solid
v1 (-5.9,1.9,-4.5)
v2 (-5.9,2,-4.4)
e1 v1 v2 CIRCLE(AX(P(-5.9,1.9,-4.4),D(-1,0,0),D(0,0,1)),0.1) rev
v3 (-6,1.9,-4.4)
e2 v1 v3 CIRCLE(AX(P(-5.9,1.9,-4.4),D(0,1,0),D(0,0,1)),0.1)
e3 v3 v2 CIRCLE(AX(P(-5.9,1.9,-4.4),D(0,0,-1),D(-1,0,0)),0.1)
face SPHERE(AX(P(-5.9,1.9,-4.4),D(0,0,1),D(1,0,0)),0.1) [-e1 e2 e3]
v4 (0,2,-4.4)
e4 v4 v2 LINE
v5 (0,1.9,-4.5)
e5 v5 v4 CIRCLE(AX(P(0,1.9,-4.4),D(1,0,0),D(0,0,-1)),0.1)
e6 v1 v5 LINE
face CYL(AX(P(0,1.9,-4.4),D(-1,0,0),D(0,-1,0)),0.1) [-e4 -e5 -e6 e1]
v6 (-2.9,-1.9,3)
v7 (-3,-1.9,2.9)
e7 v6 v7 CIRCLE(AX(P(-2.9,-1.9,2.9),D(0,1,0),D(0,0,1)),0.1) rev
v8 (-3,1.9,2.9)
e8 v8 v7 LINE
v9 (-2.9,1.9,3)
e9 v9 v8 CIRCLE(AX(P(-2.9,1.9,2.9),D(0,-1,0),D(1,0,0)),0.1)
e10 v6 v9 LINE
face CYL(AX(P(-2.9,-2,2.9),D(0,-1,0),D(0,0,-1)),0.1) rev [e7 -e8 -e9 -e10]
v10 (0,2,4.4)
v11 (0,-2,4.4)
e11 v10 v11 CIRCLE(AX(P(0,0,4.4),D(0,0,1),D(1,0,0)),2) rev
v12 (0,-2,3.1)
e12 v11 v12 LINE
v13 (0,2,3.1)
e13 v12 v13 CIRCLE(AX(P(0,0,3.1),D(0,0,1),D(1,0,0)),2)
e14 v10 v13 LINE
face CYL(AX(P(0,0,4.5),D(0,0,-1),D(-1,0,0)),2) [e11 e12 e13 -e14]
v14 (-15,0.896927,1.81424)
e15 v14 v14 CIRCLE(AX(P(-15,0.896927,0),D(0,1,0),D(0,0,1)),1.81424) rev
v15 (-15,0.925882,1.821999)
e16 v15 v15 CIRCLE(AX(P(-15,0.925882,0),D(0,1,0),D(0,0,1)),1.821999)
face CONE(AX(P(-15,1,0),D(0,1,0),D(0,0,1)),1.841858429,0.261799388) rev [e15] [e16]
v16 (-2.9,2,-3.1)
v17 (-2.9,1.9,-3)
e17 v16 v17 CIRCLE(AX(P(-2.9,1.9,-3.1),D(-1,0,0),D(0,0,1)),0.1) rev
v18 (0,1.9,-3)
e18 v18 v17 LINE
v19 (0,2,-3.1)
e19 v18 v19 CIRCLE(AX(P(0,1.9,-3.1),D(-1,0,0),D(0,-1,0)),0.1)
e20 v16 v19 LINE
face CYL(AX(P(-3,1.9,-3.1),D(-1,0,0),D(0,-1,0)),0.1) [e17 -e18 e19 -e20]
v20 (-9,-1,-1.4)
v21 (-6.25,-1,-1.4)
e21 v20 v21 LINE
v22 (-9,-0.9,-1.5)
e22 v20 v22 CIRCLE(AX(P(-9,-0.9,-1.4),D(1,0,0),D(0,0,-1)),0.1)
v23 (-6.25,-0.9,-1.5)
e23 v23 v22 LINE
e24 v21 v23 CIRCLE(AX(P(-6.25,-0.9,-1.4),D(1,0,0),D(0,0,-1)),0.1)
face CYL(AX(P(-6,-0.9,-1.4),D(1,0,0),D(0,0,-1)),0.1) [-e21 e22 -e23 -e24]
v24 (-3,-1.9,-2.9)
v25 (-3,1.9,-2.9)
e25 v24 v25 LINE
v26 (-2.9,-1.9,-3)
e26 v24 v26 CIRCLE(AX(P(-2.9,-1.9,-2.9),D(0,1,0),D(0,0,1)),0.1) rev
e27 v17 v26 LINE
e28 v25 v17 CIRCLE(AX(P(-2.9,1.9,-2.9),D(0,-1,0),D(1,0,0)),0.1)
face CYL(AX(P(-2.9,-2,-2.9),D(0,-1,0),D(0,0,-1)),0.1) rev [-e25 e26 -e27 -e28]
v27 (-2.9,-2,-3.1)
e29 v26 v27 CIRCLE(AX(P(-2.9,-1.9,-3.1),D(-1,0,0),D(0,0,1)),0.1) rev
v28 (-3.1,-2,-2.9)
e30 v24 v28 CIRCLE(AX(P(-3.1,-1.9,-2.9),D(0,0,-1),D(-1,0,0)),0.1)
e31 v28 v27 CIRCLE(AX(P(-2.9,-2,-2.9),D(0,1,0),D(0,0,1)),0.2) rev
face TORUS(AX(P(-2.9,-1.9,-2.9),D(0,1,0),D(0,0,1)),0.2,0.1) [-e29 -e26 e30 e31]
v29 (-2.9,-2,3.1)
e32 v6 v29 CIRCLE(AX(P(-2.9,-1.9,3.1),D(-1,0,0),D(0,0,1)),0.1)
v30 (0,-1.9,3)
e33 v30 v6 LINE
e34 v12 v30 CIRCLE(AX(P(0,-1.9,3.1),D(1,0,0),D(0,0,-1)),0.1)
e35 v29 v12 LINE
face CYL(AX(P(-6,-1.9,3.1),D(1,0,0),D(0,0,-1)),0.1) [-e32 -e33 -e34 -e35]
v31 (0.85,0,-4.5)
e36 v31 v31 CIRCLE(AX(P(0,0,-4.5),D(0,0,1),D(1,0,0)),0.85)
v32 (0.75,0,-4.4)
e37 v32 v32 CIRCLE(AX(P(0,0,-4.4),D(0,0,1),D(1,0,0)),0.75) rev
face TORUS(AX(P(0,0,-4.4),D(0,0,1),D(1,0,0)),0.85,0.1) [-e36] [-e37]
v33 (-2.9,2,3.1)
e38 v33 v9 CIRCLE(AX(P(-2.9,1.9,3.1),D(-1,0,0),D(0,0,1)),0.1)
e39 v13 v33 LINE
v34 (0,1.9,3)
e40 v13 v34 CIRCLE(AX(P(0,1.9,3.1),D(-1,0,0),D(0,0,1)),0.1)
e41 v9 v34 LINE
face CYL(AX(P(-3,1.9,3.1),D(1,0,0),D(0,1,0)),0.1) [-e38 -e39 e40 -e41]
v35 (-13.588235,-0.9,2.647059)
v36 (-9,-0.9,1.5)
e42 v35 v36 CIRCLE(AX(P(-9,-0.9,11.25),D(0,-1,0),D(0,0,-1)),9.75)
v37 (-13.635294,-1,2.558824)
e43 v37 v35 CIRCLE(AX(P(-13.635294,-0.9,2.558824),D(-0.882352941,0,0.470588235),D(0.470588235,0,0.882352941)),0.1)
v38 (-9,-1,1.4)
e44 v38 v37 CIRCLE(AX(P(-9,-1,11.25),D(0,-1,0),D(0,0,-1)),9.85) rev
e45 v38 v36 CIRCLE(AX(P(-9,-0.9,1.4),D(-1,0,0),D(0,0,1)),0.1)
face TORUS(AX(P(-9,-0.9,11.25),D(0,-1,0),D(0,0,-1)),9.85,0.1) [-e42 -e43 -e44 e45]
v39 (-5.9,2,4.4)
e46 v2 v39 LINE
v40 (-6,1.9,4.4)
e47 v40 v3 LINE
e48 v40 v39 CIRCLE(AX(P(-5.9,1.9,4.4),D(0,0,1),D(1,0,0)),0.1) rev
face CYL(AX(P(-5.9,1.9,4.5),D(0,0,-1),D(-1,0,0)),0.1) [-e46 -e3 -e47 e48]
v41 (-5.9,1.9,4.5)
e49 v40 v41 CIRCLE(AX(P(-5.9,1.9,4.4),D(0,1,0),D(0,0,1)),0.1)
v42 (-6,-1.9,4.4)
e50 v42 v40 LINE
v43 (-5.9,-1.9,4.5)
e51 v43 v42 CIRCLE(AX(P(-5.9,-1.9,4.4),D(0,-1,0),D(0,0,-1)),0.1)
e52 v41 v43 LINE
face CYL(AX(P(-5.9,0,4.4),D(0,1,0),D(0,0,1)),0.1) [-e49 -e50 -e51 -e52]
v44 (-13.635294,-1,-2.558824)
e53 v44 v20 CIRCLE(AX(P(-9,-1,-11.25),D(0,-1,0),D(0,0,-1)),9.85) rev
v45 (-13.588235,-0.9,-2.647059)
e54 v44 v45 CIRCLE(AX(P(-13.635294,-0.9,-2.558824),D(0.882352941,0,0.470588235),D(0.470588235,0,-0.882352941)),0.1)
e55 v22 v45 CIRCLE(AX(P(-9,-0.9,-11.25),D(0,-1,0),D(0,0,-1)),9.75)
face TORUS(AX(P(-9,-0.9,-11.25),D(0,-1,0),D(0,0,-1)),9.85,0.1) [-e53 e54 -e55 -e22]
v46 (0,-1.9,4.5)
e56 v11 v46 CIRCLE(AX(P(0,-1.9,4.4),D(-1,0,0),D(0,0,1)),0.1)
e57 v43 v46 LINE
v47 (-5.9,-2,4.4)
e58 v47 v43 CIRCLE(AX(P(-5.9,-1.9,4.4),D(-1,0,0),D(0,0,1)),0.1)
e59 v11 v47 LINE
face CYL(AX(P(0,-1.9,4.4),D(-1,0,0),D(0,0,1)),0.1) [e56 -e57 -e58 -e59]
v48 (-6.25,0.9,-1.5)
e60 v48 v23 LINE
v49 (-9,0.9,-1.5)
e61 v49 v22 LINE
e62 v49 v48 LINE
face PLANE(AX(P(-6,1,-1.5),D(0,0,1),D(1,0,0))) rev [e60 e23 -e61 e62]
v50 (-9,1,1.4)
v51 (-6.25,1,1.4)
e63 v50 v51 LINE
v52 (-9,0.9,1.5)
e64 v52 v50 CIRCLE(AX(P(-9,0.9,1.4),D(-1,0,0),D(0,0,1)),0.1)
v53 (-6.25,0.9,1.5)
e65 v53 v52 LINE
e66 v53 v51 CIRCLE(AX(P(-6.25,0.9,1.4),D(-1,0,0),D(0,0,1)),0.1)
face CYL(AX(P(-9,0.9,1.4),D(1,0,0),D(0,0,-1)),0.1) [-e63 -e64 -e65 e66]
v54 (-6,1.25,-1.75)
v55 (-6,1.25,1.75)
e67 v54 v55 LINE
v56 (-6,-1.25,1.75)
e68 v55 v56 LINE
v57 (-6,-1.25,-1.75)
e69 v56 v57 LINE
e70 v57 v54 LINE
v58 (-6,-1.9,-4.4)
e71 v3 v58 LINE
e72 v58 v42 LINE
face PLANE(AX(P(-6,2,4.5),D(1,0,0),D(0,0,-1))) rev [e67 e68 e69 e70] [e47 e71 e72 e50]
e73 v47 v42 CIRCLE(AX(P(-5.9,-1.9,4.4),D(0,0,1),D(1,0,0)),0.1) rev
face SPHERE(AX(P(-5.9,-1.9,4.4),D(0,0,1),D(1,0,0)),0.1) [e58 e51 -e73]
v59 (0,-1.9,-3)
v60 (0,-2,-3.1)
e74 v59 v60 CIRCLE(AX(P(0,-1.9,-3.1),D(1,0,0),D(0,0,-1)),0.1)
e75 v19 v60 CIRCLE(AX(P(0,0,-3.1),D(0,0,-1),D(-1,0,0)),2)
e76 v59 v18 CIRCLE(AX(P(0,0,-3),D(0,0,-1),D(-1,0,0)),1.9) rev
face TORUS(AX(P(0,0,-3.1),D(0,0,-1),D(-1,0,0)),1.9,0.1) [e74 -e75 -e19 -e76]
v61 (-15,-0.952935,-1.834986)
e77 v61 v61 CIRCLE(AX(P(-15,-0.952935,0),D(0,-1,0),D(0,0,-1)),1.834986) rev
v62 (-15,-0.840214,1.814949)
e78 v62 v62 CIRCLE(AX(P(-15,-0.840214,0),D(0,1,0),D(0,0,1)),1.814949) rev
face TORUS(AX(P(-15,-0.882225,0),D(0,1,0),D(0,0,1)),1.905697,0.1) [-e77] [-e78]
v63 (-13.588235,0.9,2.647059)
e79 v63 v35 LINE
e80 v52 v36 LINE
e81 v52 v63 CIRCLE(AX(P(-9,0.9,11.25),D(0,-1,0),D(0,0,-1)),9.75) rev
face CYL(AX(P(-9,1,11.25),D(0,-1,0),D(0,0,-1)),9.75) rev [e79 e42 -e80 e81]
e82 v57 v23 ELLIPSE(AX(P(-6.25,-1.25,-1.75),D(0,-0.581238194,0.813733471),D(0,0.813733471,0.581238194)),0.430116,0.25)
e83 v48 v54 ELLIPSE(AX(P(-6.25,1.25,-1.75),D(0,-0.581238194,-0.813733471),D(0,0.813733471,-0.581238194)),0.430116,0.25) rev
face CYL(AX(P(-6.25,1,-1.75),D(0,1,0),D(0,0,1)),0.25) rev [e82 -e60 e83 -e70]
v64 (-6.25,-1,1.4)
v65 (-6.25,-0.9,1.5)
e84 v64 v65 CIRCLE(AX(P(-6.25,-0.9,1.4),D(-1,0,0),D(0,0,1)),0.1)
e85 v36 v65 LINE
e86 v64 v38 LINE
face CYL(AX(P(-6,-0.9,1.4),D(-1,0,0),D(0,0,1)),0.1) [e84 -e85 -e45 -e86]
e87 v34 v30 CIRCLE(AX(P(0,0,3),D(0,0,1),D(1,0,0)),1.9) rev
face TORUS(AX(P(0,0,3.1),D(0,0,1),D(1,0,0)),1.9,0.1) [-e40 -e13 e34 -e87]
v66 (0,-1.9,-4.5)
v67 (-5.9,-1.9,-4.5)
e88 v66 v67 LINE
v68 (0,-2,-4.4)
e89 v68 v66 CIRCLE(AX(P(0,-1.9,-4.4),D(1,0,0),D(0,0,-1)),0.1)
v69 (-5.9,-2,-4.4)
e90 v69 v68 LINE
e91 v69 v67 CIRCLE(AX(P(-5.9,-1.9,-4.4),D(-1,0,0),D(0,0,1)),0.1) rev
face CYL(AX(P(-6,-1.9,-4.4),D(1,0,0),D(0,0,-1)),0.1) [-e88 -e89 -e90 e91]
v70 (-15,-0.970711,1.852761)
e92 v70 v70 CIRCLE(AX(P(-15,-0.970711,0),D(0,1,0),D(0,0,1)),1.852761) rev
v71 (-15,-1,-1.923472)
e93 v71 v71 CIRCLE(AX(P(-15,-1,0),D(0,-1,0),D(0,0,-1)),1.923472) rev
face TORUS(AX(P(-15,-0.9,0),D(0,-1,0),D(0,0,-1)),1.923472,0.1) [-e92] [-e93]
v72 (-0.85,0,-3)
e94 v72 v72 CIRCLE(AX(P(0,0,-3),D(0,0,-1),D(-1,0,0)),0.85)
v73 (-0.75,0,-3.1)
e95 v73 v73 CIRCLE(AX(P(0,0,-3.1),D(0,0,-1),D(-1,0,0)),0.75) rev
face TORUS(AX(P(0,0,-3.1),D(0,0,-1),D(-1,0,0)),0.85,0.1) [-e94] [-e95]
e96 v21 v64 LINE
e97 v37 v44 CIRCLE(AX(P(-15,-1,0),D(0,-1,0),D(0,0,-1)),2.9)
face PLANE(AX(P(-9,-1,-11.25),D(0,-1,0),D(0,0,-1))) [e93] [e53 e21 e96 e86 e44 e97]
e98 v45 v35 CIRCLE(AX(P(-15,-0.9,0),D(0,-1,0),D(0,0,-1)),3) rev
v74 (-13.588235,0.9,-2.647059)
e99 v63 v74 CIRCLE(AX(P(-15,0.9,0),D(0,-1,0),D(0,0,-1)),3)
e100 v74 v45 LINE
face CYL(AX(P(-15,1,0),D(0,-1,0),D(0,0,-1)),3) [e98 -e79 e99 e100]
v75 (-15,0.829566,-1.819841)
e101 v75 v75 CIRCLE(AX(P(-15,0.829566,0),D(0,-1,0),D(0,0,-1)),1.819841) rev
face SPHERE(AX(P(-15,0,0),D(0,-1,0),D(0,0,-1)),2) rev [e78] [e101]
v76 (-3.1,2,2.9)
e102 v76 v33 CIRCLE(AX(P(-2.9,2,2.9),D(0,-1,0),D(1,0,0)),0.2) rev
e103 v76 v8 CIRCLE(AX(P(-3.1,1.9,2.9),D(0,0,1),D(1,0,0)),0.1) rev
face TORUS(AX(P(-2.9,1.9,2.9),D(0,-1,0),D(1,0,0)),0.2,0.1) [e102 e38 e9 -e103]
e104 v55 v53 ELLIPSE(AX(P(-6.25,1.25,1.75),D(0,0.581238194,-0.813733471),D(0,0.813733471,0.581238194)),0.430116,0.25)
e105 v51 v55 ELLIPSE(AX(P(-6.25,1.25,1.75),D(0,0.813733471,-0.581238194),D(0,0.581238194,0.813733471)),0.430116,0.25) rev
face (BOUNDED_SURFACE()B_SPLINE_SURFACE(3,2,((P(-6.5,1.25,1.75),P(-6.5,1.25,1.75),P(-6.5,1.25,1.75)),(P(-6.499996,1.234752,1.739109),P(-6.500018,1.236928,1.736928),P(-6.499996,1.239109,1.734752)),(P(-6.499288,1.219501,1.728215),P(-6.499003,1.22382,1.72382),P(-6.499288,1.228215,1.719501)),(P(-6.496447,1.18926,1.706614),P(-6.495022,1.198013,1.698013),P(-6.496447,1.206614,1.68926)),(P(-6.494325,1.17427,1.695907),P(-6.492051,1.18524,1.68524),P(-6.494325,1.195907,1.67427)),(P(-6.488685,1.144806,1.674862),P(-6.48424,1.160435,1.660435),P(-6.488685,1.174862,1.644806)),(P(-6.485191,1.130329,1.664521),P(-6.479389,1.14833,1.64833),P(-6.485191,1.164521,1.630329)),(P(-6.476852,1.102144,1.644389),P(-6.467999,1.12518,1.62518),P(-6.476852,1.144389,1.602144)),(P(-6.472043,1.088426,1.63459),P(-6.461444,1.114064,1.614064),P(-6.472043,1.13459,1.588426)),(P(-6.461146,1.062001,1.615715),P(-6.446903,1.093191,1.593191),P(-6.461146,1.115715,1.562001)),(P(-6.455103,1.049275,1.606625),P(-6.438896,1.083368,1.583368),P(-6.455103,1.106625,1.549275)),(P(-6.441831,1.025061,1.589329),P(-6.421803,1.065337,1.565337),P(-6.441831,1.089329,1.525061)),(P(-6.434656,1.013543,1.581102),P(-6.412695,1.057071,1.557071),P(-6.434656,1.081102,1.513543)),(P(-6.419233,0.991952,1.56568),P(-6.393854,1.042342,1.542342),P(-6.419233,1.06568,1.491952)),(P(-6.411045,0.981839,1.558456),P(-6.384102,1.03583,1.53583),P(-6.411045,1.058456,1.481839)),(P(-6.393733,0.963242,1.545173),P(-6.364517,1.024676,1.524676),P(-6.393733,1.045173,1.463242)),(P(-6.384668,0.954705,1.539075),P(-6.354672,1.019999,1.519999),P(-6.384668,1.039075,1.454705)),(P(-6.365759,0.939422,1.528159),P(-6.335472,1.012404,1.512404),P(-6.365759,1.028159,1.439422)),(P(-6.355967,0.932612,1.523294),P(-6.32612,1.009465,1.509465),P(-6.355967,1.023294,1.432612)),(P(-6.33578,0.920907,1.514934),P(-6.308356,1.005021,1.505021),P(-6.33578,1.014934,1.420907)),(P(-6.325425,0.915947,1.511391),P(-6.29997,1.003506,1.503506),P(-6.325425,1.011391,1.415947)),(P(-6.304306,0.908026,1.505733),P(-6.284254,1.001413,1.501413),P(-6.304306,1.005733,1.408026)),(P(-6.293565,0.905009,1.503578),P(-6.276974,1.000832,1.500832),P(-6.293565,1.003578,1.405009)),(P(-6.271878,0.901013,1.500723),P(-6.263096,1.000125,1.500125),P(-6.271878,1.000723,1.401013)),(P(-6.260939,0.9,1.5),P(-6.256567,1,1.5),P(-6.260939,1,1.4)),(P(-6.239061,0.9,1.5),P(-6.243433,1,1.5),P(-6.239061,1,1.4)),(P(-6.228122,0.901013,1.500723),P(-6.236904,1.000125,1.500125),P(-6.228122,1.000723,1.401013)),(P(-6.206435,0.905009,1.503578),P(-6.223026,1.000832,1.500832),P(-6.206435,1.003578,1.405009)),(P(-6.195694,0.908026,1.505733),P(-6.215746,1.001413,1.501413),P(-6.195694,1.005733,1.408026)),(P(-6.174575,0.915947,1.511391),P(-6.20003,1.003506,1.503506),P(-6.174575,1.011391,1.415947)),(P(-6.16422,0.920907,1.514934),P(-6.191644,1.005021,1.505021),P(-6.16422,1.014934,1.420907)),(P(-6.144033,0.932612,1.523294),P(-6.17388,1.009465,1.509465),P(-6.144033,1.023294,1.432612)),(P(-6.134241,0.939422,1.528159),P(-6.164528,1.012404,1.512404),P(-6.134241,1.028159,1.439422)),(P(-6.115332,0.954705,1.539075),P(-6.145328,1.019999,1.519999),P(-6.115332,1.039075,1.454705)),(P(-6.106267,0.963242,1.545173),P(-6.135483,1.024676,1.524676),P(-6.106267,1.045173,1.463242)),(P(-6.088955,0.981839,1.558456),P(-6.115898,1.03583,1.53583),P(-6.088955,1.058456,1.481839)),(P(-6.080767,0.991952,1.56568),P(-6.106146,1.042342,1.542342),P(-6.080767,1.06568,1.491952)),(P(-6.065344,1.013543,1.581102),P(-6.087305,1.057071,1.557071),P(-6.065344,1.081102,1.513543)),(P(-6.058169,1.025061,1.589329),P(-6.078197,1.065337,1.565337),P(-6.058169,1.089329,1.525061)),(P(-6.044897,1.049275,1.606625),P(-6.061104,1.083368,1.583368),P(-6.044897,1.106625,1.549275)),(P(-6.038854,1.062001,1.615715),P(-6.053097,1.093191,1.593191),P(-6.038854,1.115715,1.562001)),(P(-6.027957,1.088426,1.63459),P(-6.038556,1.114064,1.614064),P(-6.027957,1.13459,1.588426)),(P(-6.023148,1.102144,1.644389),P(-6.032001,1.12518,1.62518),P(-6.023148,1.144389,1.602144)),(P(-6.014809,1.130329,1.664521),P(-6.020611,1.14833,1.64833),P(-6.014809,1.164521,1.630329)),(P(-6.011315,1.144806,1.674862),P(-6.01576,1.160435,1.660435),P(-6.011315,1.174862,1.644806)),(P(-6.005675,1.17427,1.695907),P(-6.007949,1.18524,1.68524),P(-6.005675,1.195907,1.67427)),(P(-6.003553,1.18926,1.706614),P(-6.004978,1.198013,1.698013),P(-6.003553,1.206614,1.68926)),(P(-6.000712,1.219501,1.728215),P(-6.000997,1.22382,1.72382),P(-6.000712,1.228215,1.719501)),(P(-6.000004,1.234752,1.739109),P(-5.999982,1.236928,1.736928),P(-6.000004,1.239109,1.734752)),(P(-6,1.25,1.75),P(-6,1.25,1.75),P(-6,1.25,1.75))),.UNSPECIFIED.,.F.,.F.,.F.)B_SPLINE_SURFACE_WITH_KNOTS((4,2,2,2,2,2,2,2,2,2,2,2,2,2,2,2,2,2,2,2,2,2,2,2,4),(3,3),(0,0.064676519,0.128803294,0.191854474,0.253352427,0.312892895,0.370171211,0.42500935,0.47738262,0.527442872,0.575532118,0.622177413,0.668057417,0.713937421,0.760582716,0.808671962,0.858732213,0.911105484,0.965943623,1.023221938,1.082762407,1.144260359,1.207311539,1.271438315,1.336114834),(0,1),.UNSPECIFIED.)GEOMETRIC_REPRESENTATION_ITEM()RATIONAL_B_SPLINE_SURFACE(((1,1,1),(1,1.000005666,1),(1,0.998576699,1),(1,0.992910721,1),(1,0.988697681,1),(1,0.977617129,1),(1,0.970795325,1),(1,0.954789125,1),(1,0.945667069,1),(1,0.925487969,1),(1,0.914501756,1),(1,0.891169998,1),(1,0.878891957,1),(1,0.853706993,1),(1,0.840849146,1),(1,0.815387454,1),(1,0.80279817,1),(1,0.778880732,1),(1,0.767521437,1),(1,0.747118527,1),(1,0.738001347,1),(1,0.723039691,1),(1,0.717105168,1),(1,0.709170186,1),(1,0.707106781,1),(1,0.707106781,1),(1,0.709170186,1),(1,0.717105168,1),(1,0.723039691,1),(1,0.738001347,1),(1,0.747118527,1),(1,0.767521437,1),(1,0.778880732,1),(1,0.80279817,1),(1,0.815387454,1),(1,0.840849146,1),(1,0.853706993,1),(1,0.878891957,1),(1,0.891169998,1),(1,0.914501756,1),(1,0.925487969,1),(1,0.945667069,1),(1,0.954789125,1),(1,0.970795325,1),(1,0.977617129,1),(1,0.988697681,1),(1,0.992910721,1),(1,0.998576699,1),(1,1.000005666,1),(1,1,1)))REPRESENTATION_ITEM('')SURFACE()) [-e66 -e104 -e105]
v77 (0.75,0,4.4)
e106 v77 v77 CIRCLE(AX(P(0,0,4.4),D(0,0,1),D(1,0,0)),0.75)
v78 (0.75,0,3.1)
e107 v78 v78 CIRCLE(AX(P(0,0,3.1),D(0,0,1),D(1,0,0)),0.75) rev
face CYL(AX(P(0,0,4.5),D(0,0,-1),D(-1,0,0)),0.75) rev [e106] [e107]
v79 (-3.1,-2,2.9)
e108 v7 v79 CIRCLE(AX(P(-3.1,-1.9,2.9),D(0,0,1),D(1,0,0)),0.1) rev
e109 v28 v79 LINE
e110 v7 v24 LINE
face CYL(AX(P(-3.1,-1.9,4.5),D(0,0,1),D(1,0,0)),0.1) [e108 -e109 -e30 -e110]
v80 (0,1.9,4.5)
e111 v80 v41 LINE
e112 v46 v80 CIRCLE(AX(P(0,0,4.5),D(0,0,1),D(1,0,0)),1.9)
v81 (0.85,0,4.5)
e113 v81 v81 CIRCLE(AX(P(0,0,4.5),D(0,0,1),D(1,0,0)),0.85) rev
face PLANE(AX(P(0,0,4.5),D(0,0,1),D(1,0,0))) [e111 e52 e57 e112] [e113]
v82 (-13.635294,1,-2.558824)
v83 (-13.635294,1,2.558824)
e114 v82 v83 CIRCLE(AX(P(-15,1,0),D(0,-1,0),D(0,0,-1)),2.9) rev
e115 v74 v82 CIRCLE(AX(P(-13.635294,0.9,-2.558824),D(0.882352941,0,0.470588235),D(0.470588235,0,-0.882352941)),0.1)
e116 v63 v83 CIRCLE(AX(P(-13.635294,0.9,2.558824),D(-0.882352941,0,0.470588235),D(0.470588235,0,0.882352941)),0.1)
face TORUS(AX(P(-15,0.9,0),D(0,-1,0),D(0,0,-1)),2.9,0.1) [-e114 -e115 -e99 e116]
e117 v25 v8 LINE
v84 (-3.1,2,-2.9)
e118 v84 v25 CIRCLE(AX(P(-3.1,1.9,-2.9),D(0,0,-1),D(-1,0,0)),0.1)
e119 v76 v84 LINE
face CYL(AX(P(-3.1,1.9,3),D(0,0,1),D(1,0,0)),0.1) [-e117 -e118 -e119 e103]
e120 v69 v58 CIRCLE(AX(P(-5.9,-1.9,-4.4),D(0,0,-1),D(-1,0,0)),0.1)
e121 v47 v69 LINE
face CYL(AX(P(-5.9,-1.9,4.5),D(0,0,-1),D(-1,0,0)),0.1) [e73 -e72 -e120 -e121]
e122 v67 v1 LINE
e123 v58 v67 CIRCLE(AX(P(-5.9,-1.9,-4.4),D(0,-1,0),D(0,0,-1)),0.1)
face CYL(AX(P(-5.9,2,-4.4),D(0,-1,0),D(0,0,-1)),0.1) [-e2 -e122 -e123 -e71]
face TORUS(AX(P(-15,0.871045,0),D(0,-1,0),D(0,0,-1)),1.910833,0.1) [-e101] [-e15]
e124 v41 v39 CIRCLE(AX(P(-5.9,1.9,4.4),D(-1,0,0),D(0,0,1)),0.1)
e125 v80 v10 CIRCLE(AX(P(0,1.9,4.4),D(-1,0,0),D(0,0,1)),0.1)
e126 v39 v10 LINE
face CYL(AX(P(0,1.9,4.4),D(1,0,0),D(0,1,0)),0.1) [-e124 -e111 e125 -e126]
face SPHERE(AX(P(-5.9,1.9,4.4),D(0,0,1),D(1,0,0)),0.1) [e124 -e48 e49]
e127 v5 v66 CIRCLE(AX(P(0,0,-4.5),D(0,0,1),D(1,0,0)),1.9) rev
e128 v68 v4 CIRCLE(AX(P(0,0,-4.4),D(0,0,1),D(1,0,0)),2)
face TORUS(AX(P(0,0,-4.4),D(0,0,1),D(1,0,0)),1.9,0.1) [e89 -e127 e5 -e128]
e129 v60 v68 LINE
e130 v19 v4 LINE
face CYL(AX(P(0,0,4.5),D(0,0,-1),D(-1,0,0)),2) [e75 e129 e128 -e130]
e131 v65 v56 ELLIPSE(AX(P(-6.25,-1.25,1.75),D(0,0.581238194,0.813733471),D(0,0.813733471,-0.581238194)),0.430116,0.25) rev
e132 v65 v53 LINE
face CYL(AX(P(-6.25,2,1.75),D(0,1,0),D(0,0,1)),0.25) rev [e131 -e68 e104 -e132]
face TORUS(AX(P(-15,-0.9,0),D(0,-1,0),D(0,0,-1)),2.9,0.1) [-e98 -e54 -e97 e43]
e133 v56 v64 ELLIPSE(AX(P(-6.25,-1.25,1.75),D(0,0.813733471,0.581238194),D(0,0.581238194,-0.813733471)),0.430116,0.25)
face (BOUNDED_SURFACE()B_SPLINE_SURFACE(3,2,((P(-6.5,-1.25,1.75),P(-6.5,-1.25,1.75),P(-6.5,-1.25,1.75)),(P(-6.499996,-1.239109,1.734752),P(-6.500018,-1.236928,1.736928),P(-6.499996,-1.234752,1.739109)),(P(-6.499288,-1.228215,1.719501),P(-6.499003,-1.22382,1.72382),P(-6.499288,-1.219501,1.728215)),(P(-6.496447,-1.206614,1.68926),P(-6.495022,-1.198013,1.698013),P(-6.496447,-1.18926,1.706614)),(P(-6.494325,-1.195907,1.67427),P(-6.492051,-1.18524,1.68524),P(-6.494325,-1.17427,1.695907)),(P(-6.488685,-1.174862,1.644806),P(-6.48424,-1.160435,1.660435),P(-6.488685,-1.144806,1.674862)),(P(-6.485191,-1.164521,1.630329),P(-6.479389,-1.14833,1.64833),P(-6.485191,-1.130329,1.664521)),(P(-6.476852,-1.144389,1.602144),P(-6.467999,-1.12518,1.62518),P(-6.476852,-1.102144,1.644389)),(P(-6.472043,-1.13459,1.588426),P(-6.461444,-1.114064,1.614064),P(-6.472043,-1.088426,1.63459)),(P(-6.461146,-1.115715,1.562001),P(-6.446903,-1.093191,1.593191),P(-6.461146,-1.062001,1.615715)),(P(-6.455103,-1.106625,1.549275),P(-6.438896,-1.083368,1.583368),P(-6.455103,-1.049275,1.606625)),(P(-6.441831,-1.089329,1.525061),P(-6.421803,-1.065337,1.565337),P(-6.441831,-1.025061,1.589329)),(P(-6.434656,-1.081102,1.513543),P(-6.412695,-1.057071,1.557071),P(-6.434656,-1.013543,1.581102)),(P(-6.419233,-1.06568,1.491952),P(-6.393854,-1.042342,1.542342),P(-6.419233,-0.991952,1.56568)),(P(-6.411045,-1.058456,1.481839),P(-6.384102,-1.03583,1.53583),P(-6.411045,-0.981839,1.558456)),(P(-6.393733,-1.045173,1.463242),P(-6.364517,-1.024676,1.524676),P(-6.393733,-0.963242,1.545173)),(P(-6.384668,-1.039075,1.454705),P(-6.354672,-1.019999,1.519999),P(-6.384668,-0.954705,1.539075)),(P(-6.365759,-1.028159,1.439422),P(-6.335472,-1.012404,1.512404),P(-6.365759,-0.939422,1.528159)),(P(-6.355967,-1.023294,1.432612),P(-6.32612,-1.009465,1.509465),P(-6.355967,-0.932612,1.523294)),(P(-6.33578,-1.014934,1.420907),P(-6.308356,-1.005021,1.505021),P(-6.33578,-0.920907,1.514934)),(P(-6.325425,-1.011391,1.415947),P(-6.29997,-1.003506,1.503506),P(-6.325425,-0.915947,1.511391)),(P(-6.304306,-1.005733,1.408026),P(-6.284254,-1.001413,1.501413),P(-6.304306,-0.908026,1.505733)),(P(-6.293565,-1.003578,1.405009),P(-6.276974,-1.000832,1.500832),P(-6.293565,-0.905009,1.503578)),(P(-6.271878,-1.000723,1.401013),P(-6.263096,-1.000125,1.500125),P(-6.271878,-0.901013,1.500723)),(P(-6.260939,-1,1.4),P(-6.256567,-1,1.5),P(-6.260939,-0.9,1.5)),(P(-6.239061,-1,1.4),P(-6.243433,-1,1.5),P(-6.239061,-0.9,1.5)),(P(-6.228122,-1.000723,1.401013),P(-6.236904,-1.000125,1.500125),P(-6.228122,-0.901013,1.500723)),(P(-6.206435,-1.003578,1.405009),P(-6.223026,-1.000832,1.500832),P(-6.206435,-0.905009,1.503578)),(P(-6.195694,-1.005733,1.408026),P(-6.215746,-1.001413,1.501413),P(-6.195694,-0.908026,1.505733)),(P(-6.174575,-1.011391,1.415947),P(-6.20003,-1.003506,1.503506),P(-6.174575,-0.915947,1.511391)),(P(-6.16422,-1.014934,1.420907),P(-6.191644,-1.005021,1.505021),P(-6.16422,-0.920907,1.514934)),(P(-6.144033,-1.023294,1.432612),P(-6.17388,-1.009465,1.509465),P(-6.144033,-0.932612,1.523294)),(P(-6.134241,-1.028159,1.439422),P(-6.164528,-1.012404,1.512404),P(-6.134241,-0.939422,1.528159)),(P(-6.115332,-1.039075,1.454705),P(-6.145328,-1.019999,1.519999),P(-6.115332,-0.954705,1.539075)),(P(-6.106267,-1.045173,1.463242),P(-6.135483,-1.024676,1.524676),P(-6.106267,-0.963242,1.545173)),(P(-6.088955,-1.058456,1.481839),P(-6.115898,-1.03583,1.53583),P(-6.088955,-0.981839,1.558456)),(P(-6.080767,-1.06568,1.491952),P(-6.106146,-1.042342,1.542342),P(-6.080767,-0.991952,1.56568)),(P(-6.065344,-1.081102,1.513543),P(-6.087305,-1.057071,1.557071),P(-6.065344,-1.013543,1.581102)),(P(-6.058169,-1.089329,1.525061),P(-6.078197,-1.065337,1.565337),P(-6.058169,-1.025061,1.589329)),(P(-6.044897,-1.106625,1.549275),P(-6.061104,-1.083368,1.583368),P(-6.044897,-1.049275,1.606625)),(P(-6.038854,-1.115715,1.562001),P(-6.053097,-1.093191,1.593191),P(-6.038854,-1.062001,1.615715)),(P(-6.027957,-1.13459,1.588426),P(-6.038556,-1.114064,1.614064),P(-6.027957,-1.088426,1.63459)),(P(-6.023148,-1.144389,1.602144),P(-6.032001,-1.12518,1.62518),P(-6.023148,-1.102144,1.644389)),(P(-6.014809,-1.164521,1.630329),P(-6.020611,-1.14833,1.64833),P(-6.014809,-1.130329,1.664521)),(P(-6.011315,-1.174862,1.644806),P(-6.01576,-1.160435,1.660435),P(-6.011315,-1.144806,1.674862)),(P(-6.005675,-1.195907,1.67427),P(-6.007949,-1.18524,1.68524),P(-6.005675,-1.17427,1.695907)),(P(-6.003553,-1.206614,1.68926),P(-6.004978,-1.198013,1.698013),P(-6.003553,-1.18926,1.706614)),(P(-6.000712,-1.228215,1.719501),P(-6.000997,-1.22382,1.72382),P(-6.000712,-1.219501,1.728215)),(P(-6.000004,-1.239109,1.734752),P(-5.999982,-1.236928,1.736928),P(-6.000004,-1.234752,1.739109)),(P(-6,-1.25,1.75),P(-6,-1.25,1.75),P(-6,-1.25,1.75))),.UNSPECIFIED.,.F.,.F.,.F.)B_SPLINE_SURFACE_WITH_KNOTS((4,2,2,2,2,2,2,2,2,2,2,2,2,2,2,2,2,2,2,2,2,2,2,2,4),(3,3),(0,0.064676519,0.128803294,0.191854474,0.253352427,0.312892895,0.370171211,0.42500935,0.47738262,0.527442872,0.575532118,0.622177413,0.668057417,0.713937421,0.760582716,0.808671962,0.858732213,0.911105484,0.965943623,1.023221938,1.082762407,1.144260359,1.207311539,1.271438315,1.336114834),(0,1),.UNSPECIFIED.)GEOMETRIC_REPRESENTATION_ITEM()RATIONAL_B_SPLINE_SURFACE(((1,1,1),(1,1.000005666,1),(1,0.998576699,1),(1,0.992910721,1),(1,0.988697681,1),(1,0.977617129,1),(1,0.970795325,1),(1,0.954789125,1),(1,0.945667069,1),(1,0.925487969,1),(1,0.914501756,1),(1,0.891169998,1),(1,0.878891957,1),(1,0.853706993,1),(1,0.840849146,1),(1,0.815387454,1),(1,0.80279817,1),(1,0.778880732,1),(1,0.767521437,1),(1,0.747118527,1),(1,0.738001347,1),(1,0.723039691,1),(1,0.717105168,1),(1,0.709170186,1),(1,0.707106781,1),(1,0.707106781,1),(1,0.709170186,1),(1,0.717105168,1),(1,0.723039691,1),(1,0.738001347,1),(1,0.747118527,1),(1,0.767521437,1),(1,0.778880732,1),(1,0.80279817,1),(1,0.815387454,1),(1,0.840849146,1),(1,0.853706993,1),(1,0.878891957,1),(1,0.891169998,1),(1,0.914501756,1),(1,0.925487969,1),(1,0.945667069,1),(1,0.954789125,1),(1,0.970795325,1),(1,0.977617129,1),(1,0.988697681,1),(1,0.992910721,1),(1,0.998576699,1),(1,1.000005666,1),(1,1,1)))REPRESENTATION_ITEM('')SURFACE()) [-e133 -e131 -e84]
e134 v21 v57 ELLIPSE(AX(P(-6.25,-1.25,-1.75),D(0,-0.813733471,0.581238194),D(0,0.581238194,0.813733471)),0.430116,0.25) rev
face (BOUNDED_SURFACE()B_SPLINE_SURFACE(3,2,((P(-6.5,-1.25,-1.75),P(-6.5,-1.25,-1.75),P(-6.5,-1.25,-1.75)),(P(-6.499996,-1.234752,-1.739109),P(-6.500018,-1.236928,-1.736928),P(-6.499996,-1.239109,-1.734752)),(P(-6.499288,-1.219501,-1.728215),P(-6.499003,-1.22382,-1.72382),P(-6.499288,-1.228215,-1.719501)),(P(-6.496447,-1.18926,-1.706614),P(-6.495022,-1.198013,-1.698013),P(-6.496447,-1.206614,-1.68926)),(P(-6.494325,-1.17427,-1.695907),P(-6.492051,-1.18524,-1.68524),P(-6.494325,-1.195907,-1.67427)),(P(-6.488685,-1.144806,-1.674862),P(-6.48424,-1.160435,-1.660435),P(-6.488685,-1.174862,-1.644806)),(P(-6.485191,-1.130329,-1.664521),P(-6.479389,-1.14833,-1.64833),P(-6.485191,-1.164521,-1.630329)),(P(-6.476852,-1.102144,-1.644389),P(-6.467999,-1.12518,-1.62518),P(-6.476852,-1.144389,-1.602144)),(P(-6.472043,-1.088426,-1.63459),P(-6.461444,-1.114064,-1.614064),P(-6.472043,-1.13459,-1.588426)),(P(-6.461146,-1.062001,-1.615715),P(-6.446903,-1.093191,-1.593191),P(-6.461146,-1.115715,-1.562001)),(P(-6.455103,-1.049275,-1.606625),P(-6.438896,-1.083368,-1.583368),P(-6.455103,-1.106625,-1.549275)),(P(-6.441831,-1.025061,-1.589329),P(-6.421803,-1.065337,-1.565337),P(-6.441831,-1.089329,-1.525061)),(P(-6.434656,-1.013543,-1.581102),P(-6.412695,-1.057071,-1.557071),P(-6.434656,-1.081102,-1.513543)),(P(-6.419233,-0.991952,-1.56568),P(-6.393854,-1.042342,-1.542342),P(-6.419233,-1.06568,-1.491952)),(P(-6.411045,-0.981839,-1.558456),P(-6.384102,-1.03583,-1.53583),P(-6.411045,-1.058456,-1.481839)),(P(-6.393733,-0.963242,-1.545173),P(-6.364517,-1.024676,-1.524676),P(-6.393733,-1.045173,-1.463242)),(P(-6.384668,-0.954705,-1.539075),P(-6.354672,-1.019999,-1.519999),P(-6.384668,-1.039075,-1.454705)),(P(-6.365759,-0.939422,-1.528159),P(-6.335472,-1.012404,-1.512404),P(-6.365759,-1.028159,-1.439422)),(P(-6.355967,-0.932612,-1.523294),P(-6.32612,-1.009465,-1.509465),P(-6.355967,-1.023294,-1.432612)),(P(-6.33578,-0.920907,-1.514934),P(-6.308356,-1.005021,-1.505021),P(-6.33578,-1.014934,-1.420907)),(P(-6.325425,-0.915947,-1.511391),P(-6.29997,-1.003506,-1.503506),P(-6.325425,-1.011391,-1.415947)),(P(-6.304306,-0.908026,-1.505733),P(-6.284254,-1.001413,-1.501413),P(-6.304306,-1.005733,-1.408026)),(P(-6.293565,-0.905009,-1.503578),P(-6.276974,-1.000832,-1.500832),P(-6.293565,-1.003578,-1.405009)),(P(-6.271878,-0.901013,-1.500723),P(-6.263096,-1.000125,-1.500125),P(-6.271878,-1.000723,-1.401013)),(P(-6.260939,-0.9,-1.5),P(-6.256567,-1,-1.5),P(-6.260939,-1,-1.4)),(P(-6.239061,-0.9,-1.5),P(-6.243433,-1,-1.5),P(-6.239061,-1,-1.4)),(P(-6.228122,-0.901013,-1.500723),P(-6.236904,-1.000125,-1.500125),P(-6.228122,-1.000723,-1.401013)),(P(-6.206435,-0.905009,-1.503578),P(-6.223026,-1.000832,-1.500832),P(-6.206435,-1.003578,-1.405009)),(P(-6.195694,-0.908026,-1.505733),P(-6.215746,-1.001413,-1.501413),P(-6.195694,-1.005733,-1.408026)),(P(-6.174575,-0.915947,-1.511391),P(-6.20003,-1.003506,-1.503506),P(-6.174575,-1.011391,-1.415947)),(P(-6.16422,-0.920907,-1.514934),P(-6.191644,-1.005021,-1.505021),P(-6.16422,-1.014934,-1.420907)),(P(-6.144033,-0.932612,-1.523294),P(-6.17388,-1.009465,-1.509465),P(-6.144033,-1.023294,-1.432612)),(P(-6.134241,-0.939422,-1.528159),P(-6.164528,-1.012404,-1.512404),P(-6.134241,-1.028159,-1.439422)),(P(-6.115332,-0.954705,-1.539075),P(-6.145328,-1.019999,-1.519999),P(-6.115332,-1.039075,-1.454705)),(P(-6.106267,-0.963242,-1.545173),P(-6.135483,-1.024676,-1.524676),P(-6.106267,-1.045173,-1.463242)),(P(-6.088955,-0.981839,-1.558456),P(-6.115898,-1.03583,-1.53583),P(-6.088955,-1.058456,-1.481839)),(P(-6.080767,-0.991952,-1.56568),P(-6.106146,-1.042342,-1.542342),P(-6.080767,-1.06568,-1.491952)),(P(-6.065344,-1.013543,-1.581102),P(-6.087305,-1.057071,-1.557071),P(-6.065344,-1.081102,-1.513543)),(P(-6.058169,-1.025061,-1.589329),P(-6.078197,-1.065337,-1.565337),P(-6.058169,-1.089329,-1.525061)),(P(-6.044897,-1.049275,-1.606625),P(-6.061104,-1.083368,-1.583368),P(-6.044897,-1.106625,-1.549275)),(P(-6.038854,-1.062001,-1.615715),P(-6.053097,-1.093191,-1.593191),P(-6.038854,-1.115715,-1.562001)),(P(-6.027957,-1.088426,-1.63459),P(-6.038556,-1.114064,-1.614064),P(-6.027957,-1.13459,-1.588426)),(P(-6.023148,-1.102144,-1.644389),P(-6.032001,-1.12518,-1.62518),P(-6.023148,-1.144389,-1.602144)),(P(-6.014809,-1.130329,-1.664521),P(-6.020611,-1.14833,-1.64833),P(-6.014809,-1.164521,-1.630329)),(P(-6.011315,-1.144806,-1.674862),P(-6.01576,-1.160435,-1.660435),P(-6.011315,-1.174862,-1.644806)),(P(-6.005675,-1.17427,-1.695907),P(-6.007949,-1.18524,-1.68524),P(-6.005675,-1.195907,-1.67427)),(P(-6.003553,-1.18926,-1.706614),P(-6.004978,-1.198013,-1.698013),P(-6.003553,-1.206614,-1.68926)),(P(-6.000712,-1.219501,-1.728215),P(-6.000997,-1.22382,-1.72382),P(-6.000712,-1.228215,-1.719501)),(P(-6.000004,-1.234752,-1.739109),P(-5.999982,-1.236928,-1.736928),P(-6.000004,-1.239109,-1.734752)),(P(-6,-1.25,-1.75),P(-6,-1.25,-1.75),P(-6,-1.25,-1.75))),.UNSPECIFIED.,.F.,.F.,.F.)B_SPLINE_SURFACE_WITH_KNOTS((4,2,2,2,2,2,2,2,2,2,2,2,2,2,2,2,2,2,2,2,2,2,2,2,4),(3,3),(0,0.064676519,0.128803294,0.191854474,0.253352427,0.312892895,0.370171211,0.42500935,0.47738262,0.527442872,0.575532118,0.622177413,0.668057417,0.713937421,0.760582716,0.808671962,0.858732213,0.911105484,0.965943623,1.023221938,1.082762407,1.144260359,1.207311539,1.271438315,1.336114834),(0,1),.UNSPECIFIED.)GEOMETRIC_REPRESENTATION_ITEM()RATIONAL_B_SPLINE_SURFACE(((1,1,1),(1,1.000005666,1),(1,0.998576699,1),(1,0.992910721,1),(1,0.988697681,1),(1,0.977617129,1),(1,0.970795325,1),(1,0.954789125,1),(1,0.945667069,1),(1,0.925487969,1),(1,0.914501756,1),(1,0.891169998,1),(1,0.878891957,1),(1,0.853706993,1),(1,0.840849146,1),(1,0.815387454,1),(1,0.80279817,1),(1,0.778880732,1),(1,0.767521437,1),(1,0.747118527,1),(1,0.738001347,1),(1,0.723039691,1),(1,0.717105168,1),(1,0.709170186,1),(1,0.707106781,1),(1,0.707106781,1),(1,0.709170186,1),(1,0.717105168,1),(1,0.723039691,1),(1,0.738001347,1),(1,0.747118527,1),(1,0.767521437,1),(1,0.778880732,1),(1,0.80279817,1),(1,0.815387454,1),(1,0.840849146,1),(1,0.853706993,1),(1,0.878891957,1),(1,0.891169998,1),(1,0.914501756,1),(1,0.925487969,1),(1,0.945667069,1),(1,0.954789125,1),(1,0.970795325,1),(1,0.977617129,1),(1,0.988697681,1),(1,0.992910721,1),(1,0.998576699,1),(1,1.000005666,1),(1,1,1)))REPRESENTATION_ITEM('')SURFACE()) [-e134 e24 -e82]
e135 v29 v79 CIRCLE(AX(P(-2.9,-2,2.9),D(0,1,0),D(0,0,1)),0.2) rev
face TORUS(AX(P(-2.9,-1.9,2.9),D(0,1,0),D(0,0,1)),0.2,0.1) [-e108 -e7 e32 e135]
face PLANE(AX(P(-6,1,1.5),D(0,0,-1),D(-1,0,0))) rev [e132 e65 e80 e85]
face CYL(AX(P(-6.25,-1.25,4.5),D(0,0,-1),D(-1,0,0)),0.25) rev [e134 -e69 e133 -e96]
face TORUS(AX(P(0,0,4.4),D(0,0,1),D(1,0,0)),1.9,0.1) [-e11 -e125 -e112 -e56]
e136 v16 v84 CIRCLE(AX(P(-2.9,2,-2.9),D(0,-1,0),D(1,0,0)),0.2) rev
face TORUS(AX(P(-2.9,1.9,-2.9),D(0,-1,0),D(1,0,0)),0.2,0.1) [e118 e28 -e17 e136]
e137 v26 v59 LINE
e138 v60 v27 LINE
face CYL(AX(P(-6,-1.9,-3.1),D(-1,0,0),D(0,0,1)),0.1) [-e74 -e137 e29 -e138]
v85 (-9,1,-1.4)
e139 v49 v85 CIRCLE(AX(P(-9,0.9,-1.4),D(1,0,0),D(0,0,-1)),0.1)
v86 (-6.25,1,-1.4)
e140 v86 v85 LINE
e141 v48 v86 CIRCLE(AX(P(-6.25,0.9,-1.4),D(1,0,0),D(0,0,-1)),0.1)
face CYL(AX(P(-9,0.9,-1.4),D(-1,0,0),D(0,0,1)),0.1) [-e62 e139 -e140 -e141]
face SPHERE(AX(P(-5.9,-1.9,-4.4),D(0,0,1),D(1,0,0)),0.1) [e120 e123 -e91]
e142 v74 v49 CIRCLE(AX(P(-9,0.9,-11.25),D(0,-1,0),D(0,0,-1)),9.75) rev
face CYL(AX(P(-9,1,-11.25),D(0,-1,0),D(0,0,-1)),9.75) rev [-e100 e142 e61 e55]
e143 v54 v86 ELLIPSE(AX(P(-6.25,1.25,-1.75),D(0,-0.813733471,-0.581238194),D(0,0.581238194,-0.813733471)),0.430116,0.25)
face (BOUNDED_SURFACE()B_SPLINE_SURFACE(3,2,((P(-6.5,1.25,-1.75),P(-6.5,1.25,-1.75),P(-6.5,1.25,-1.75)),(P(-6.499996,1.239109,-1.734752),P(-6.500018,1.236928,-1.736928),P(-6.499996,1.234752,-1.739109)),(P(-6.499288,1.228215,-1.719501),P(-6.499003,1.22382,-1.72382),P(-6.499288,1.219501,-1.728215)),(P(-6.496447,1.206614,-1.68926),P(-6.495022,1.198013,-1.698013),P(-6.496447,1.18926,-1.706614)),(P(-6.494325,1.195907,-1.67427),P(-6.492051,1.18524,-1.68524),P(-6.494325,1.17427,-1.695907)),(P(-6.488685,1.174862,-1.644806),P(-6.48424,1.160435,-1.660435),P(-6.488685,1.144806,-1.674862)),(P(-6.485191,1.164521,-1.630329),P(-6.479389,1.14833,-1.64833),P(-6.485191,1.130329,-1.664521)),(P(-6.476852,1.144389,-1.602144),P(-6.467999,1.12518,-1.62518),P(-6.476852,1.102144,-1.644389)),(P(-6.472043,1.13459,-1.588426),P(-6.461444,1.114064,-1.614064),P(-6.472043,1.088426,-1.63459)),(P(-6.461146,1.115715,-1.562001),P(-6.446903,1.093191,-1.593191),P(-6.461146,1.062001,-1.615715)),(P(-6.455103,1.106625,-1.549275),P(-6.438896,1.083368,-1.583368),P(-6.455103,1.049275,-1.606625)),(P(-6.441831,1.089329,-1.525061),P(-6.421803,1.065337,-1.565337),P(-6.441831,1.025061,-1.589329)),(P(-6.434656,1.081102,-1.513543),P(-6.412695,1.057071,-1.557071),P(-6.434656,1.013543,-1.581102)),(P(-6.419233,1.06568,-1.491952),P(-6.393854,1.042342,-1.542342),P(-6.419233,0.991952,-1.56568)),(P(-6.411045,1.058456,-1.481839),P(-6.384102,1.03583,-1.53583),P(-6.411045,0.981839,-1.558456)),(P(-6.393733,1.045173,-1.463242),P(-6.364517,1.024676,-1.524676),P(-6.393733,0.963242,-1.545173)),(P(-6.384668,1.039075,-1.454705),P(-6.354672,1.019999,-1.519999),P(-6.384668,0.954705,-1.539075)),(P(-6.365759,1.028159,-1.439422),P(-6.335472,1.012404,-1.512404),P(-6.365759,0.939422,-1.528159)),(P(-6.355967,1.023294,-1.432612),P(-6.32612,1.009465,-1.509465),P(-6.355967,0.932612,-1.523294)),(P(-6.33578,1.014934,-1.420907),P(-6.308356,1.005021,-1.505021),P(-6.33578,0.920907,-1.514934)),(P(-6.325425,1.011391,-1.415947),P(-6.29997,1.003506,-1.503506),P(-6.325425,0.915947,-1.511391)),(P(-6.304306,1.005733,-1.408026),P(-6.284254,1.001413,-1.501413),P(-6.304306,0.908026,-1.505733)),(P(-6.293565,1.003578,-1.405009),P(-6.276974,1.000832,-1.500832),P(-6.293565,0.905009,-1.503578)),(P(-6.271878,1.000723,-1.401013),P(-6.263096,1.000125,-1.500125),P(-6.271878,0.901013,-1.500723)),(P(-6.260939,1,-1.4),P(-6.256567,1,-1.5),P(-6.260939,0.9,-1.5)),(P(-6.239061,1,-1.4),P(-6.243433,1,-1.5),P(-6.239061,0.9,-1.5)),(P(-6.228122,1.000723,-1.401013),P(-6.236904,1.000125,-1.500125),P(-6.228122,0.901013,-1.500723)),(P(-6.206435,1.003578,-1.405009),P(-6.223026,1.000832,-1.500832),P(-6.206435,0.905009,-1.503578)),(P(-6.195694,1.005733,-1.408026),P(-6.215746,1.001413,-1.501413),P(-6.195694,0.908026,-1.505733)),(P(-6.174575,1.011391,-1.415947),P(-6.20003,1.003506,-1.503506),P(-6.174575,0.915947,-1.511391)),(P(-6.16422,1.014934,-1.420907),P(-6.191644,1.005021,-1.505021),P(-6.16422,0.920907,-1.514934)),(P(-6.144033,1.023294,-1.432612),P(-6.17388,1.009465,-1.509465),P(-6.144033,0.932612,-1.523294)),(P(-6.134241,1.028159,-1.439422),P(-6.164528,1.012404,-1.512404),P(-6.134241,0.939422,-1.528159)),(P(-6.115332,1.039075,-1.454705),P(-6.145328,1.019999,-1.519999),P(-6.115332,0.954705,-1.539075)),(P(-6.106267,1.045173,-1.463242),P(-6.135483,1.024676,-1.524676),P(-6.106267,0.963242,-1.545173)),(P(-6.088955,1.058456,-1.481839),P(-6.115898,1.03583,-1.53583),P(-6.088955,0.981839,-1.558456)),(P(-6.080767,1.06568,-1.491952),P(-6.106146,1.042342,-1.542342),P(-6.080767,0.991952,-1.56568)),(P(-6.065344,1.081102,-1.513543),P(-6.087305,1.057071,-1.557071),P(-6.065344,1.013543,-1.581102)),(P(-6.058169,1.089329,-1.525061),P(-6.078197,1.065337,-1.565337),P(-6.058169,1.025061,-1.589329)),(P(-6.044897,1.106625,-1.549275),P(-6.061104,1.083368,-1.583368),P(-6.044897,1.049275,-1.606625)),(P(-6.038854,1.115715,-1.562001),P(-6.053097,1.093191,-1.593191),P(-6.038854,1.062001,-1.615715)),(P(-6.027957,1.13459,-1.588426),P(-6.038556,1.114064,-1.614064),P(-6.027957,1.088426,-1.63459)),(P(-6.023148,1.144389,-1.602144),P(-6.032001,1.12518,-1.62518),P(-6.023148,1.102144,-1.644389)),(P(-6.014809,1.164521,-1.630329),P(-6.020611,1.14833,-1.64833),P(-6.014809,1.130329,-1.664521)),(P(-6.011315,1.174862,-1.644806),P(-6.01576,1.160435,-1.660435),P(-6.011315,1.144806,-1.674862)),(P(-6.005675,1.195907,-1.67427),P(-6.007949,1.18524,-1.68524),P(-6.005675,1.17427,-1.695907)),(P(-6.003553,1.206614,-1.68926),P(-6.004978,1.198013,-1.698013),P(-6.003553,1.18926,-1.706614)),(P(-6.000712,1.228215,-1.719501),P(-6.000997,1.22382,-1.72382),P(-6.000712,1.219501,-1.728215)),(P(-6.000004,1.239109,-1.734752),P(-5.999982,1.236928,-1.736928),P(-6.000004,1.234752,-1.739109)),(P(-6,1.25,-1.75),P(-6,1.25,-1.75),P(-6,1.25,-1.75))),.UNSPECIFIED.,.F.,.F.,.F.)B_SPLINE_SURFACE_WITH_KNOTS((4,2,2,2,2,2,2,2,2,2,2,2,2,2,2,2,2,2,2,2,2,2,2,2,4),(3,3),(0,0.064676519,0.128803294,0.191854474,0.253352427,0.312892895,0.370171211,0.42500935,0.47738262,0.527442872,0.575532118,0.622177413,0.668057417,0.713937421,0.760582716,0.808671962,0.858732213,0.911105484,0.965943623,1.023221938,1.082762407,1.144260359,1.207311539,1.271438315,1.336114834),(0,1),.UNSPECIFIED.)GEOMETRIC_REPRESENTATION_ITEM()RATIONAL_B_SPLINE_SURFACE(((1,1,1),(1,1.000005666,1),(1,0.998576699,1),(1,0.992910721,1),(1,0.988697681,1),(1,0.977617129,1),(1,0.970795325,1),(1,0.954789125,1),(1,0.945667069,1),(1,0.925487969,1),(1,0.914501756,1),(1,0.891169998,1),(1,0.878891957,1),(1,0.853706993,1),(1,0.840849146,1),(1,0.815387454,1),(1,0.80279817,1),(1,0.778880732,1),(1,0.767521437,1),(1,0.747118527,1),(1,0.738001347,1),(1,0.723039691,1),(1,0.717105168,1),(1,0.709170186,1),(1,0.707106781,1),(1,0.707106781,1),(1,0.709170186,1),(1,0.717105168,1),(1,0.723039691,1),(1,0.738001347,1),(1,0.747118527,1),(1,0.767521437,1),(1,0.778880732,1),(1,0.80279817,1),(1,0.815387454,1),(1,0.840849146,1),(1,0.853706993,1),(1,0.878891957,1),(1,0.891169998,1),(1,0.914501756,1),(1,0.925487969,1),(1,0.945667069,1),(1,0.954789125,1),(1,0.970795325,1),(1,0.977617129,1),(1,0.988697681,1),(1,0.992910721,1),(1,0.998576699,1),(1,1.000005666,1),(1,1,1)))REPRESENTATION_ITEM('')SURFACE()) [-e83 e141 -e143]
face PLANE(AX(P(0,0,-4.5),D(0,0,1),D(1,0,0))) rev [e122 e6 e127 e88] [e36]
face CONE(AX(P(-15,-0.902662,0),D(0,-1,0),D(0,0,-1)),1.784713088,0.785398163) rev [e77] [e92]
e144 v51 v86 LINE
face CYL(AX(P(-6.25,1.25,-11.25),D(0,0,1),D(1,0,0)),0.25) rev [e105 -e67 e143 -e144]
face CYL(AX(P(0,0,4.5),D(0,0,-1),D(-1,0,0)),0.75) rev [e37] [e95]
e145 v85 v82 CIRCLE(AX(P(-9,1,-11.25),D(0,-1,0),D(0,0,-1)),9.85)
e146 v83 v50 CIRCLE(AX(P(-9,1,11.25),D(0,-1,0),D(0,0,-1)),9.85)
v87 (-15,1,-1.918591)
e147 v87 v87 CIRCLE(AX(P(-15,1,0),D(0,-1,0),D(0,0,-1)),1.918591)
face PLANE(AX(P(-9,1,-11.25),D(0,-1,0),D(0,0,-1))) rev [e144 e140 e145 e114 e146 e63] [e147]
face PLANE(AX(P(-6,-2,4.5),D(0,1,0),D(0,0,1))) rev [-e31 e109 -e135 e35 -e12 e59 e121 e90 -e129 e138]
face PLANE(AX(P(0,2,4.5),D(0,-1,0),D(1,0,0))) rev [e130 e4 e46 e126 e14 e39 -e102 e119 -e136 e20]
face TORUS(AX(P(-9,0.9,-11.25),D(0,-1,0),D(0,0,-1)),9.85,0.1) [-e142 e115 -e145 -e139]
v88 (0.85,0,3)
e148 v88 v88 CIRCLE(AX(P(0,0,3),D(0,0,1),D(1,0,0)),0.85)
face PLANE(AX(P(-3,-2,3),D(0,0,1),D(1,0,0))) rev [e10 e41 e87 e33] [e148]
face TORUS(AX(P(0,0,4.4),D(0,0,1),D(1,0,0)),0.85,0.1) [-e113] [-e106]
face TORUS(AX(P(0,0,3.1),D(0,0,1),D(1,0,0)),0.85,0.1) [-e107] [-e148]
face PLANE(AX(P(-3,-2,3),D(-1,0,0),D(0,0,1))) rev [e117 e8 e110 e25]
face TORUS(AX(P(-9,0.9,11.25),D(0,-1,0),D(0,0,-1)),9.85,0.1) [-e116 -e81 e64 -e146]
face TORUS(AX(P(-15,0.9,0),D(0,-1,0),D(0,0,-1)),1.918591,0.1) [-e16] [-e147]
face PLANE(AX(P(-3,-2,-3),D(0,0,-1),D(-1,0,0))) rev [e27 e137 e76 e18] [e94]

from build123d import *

# Parameters (mm, degrees)
SKETCH1_R               = 0.75
BOSS_EXTRUDE1_DEPTH     = 4.5
CUT_EXTRUDE1_DEPTH      = 8.762087348
CUT_EXTRUDE1_DEPTH_BACK = 8.762087348
SKETCH2_W               = 6
SKETCH2_H               = 6
SKETCH4_R               = 1.375
BOSS_EXTRUDE2_DEPTH     = 1
FILLET1_R               = 0.25
CHAMFER1_SIZE           = 0.109807621
CHAMFER1_SIZE_2         = 0.15
FILLET2_R               = 0.1


with BuildPart() as part:
    # Sketch1 → Boss-Extrude1 (new, symmetric)
    with BuildSketch(Plane.XY):
        with BuildLine():
            Line((0, 2), (-6, 2))
            Line((-6, 2), (-6, -2))
            Line((-6, -2), (0, -2))
            ThreePointArc((0, -2), (2, 0), (0, 2))
        make_face()
        Circle(SKETCH1_R, mode=Mode.SUBTRACT)
    extrude(amount=BOSS_EXTRUDE1_DEPTH, both=True)

    # Sketch2 → Cut-Extrude1 (cut, two sides: drawn at the far end of the back side and taken through both)
    with BuildSketch(Plane(origin=(0, 0, 0), x_dir=(1, 0, 0), z_dir=(0, 1, 0)).offset(-CUT_EXTRUDE1_DEPTH_BACK)):
        Rectangle(SKETCH2_W, SKETCH2_H)
    extrude(amount=CUT_EXTRUDE1_DEPTH + CUT_EXTRUDE1_DEPTH_BACK, mode=Mode.SUBTRACT)

    # Sketch4 → Boss-Extrude2 (add, symmetric)
    with BuildSketch(Plane(origin=(0, 0, 0), x_dir=(1, 0, 0), z_dir=(0, 1, 0))):
        with BuildLine():
            Line((-6, 1.5), (-6, -1.5))
            Line((-6, -1.5), (-9, -1.5))
            ThreePointArc((-9, -1.5), (-11.364722344, -1.791110624), (-13.588235294, -2.647058824))
            ThreePointArc((-13.588235294, -2.647058824), (-18, 0), (-13.588235294, 2.647058824))
            ThreePointArc((-13.588235294, 2.647058824), (-11.364722344, 1.791110624), (-9, 1.5))
            Line((-9, 1.5), (-6, 1.5))
        make_face()
        with Locations(Location((-15, 0, 0), (0, 0, 270))):
            Circle(SKETCH4_R, mode=Mode.SUBTRACT)
    extrude(amount=BOSS_EXTRUDE2_DEPTH, both=True)


with BuildPart() as body_2:
    # Sketch5 → Revolve1 (revolve)
    with BuildSketch(Plane(origin=(0, 0, 0), x_dir=(1, 0, 0), z_dir=(0, 1, 0))):
        with BuildLine():
            Line((-15, 2), (-15, -2))
            ThreePointArc((-15, -2), (-17, 0), (-15, 2))
        make_face()
    revolve(axis=Axis((-15, 0, -2), (0, 0, 1)))


with BuildPart() as part_1:
    add(part.part)

    # Combine1: cut body 2
    add(body_2.part, mode=Mode.SUBTRACT)

    # Fillet1
    fillet1_edges = [part_1.edges().sort_by_distance(p)[0] for p in [
        (-6, 1, 0),
        (-6, 0, -1.5),
        (-6, -1, 0),
        (-6, 0, 1.5),
    ]]
    fillet(fillet1_edges, radius=FILLET1_R)

    # Chamfer1
    # the kernel refuses this chamfer: 0.15, 0.109807621 mm, written as the material it takes off along each edge
    with BuildSketch(Plane(origin=(-15, 1, 0), x_dir=(0, 0, -1), z_dir=(-1, 0, 0))) as chamfer1_piece_1:
        with BuildLine():
            Line((1.732050808 + CHAMFER1_SIZE * 1.00000000123, 0), (1.804817612, 0.138238208))
            ThreePointArc((1.804817612, 0.138238208), (1.770811144, 0.070361418), (1.732050808, 0))
            Line((1.732050808, 0), (1.732050808 + CHAMFER1_SIZE * 1.00000000123, 0))
        make_face()
    revolve(axis=Axis((-15, 1, 0), (0, -1, 0)), mode=Mode.SUBTRACT)
    with BuildSketch(Plane(origin=(-15, -1, 0), x_dir=(0, 0, -1), z_dir=(-1, 0, 0))) as chamfer1_piece_2:
        with BuildLine():
            Line((1.732050808 + CHAMFER1_SIZE_2, 0), (1.784713088, -0.097337719))
            ThreePointArc((1.784713088, -0.097337719), (1.759463418, -0.049059161), (1.732050808, 0))
            Line((1.732050808, 0), (1.732050808 + CHAMFER1_SIZE_2, 0))
        make_face()
    revolve(axis=Axis((-15, -1, 0), (0, -1, 0)), mode=Mode.SUBTRACT)

    # Fillet2
    fillet2_edges = [part_1.edges().sort_by_distance(p)[0] for p in [
        (-0.75, 0, -4.5),
        (-0.75, 0, 4.5),
        (-6, 0, 4.5),
        (-3, -2, 4.5),
        (-1.5, -2, 3),
        (2, 0, 3),
        (-0.75, 0, 3),
        (2, 0, -3),
        (-1.5, -2, -3),
        (-3, 0, -3),
        (-0.75, 0, -3),
        (-3, 0, 3),
        (-3, -2, 0),
        (-1.5, 2, 3),
        (-1.5, 2, -3),
        (-3, 2, 0),
        (-11.364722344, 1, -1.791110624),
        (-18, 1, 0),
        (-11.364722344, 1, 1.791110624),
        (-7.625, 1, 1.5),
        (-11.364722344, -1, -1.791110624),
        (-18, -1, 0),
        (-11.364722344, -1, 1.791110624),
        (-7.625, -1, 1.5),
        (2, 0, 4.5),
        (-3, -2, -4.5),
        (-6, 0, -4.5),
        (-3, 2, -4.5),
        (2, 0, -4.5),
        (-7.625, -1, -1.5),
        (-7.625, 1, -1.5),
        (-6.059175996, 1.088487773, 1.588487773),
        (-6.059175996, -1.088487773, 1.588487773),
        (-6.059175996, 1.088487773, -1.588487773),
        (-6.059175996, -1.088487773, -1.588487773),
        (-6, -2, 0),
        (-6, 2, 0),
        (-15, 0.861761792, 1.804817612),
        (-15, -0.902662281, 1.784713088),
        (-15, -1, 1.882050808),
        (-15, 1, 1.841858429),
        (-3, 2, 4.5),
    ]]
    fillet(fillet2_edges, radius=FILLET2_R)


solid = part_1.part
